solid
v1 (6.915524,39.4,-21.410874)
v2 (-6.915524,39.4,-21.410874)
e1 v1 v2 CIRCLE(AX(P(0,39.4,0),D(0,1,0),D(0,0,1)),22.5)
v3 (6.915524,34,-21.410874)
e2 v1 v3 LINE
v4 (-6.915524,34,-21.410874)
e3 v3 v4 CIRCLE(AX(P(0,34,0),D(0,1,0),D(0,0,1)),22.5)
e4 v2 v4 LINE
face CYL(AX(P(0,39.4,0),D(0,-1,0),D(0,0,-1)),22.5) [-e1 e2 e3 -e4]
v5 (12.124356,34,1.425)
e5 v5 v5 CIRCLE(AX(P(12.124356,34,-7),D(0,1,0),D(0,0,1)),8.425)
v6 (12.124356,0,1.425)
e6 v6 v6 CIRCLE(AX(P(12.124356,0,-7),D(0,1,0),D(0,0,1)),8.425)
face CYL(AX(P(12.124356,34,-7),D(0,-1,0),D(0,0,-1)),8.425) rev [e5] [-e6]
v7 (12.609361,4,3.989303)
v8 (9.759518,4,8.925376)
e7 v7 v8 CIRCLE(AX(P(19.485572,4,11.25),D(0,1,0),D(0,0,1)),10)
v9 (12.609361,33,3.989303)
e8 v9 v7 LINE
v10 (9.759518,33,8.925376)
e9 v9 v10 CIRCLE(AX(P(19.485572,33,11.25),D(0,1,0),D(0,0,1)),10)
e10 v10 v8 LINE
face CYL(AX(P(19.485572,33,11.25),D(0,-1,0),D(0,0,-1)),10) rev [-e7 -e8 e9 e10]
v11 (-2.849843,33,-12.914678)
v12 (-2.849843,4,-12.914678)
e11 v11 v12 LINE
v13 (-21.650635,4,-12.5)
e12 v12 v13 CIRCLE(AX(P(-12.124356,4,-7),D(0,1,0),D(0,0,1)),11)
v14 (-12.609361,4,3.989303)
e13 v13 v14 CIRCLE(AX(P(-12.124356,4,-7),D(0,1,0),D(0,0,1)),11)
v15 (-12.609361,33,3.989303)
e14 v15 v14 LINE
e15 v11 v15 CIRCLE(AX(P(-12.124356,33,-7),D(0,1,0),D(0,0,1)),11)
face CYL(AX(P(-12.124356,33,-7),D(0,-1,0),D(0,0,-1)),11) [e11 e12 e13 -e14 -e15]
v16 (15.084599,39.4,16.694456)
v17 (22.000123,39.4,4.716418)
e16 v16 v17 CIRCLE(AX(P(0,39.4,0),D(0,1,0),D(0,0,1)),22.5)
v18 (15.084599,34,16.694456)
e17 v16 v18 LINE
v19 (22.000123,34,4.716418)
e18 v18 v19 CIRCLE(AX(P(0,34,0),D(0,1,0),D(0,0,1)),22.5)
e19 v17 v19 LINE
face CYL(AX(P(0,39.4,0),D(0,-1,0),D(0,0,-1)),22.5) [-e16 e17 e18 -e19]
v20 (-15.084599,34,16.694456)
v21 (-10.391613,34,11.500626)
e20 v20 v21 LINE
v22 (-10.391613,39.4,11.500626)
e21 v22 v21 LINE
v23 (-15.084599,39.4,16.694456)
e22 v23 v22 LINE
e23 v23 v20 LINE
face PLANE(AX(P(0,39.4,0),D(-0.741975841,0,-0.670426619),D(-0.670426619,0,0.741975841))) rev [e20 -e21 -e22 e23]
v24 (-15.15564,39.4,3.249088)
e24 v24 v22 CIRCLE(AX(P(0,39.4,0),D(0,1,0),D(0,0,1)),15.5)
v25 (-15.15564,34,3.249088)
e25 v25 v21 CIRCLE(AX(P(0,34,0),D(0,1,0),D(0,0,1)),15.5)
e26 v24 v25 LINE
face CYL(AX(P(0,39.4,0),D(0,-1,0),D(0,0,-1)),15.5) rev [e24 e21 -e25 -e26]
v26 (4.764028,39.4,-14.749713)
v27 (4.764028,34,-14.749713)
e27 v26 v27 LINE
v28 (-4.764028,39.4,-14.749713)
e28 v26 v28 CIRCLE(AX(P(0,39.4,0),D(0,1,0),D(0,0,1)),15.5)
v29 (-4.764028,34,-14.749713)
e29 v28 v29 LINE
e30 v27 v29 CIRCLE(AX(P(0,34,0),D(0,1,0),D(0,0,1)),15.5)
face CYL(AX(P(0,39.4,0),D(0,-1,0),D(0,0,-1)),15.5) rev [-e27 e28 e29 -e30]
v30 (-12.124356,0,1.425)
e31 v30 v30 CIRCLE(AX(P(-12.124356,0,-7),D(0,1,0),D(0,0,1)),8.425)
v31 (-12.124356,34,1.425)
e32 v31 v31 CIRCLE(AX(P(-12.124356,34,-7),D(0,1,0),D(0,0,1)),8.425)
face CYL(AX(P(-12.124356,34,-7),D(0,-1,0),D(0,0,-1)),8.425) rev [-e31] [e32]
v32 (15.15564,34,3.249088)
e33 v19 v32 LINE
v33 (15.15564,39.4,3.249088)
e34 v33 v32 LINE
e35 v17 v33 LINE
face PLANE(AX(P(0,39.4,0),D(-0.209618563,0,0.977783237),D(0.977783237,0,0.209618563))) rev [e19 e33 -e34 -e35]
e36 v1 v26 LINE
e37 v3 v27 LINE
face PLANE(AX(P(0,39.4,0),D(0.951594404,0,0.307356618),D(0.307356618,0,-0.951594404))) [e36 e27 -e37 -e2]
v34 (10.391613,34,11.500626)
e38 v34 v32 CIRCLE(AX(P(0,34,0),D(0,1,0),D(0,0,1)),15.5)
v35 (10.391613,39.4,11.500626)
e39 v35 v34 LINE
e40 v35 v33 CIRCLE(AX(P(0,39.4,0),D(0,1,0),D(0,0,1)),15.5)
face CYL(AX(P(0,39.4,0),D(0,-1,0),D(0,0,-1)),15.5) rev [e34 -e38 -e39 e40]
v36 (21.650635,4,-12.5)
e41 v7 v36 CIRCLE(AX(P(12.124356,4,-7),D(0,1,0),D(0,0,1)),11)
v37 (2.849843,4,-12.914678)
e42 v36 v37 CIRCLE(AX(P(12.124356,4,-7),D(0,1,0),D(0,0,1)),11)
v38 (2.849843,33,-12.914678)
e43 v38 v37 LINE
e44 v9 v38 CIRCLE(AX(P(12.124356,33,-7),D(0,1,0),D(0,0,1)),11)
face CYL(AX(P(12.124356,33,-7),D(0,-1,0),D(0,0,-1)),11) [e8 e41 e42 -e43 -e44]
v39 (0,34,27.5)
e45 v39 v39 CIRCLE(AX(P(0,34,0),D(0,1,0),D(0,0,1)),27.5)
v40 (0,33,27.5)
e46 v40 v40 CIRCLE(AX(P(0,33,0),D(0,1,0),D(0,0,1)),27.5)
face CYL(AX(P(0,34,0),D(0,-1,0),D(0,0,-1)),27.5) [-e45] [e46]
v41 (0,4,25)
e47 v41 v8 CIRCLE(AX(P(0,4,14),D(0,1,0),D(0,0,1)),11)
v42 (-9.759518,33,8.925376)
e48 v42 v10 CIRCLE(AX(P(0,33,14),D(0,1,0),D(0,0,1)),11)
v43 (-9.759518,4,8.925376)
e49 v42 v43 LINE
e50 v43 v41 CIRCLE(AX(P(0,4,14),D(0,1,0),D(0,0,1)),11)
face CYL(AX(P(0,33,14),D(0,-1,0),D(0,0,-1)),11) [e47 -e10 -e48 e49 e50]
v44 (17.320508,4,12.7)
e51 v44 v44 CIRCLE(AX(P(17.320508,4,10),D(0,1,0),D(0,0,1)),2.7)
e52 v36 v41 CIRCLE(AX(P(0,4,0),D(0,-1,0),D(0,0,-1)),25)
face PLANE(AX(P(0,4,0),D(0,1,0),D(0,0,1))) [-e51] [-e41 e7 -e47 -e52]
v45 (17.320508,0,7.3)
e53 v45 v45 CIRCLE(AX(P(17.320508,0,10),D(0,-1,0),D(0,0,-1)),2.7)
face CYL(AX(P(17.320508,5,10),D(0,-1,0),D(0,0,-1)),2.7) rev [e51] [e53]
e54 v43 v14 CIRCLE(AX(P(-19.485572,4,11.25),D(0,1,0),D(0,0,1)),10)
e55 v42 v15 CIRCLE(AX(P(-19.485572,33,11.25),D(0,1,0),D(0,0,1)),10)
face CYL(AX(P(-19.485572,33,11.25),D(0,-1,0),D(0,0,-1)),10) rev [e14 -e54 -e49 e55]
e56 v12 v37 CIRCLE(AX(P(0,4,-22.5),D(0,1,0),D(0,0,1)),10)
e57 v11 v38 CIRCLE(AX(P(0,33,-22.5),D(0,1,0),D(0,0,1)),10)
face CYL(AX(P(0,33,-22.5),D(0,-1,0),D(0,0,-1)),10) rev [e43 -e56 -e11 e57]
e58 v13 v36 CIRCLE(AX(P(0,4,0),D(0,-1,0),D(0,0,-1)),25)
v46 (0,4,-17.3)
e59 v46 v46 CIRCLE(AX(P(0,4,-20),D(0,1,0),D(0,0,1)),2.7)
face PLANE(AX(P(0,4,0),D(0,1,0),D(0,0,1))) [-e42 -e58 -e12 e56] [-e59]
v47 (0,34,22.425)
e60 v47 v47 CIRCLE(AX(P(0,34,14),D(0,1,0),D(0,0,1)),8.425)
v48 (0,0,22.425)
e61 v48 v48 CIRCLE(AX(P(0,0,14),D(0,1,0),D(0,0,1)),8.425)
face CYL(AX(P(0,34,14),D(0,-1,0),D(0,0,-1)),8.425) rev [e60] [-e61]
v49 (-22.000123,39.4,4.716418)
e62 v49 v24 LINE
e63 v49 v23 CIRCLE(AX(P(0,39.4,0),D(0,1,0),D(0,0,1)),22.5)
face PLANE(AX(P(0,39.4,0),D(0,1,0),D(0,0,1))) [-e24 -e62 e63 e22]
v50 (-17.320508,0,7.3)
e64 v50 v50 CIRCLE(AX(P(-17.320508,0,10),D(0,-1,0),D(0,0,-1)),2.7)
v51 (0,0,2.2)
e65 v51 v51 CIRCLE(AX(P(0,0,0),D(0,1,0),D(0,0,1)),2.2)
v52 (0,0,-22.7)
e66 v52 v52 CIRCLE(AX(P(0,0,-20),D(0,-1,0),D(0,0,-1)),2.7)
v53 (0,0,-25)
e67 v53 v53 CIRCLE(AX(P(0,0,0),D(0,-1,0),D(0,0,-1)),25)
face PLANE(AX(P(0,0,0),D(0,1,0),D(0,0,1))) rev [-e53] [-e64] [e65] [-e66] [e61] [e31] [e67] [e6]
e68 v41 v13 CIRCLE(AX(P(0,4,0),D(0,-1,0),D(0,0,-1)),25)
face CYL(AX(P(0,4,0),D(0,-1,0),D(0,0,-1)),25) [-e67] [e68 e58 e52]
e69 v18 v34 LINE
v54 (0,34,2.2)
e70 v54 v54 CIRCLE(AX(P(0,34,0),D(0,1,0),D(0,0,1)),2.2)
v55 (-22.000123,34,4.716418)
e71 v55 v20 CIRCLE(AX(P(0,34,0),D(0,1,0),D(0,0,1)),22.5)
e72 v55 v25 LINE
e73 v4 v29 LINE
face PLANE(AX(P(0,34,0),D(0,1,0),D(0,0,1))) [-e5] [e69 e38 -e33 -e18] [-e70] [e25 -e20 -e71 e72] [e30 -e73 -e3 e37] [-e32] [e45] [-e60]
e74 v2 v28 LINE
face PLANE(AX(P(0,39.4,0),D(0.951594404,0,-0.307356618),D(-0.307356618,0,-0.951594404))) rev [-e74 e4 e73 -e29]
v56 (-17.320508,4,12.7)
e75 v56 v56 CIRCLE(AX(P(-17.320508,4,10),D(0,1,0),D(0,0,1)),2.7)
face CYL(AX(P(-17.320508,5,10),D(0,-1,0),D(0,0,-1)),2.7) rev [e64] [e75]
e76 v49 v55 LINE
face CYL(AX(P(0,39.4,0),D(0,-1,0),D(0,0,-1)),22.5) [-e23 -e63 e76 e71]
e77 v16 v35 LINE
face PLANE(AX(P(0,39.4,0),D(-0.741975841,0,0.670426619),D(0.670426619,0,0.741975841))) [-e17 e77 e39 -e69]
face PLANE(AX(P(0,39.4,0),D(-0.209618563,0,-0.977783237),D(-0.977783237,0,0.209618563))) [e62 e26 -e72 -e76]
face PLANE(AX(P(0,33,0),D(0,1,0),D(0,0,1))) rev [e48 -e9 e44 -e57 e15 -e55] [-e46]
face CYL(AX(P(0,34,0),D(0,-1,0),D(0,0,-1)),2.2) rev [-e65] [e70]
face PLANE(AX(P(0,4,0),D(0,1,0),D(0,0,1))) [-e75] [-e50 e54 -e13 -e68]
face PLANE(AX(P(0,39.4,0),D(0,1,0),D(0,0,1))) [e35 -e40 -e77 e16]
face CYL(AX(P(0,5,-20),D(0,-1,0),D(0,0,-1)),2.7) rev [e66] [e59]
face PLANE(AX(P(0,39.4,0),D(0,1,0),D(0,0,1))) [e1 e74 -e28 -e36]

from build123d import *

# Parameters (mm, degrees)
SKETCH1_R           = 27.5
SKETCH1_R_2         = 2.2
SKETCH1_R_3         = 8.425
BOSS_EXTRUDE1_DEPTH = 34
BOSS_EXTRUDE2_DEPTH = 5.4
SKETCH5_R           = 40.989273042
CUT_EXTRUDE1_DEPTH  = 29
SKETCH6_R           = 2.7
CUT_EXTRUDE2_DEPTH  = 5
SKETCH7_R           = 33.756466266
SKETCH7_R_2         = 25
CUT_EXTRUDE6_DEPTH  = 4


with BuildPart() as part:
    # Sketch1 → Boss-Extrude1 (new body)
    with BuildSketch(Plane(origin=(0, 0, 0), x_dir=(1, 0, 0), z_dir=(0, 1, 0))):
        Circle(SKETCH1_R)
        Circle(SKETCH1_R_2, mode=Mode.SUBTRACT)
        with Locations((0, -14)):
            Circle(SKETCH1_R_3, mode=Mode.SUBTRACT)
        with Locations((-12.124355653, 7)):
            Circle(SKETCH1_R_3, mode=Mode.SUBTRACT)
        with Locations((12.124355653, 7)):
            Circle(SKETCH1_R_3, mode=Mode.SUBTRACT)
    extrude(amount=BOSS_EXTRUDE1_DEPTH)

    # Sketch4 → Boss-Extrude2 (add)
    with BuildSketch(Plane(origin=(0, 34, 0), x_dir=(1, 0, 0), z_dir=(0, 1, 0))):
        with BuildLine():
            ThreePointArc((15.15564017, -3.249087725), (13.423393759, -7.75), (10.391612594, -11.500625535))
            Line((10.391612594, -11.500625535), (15.084598927, -16.694456422))
            ThreePointArc((15.084598927, -16.694456422), (19.485571585, -11.25), (22.000122827, -4.716417665))
            Line((22.000122827, -4.716417665), (15.15564017, -3.249087725))
        make_face()
        with BuildLine():
            Line((-15.084598927, -16.694456422), (-10.391612594, -11.500625535))
            ThreePointArc((-10.391612594, -11.500625535), (-13.423393759, -7.75), (-15.15564017, -3.249087725))
            Line((-15.15564017, -3.249087725), (-22.000122827, -4.716417665))
            ThreePointArc((-22.000122827, -4.716417665), (-19.485571585, -11.25), (-15.084598927, -16.694456422))
        make_face()
        with BuildLine():
            ThreePointArc((-4.764027576, 14.74971326), (0, 15.5), (4.764027576, 14.74971326))
            Line((4.764027576, 14.74971326), (6.9155239, 21.410874087))
            ThreePointArc((6.9155239, 21.410874087), (0, 22.5), (-6.9155239, 21.410874087))
            Line((-6.9155239, 21.410874087), (-4.764027576, 14.74971326))
        make_face()
    extrude(amount=BOSS_EXTRUDE2_DEPTH)

    # Sketch5 → Cut-Extrude1 (cut)
    with BuildSketch(Plane(origin=(0, 4, 0), x_dir=(1, 0, 0), z_dir=(0, 1, 0))):
        Circle(SKETCH5_R)
        with BuildLine():
            ThreePointArc((-2.849843175, 12.914678207), (0, 12.5), (2.849843175, 12.914678207))
            ThreePointArc((2.849843175, 12.914678207), (21.650635095, 12.5), (12.609360996, -3.989302517))
            ThreePointArc((12.609360996, -3.989302517), (10.825317547, -6.25), (9.759517821, -8.925375689))
            ThreePointArc((9.759517821, -8.925375689), (0, -25), (-9.759517821, -8.925375689))
            ThreePointArc((-9.759517821, -8.925375689), (-10.825317547, -6.25), (-12.609360996, -3.989302517))
            ThreePointArc((-12.609360996, -3.989302517), (-21.650635095, 12.5), (-2.849843175, 12.914678207))
        make_face(mode=Mode.SUBTRACT)
    extrude(amount=CUT_EXTRUDE1_DEPTH, mode=Mode.SUBTRACT)

    # Sketch6 → Cut-Extrude2 (cut)
    with BuildSketch(Plane.XZ):
        with Locations((0, -20)):
            Circle(SKETCH6_R)
        with Locations((-17.320508076, 10)):
            Circle(SKETCH6_R)
        with Locations((17.320508076, 10)):
            Circle(SKETCH6_R)
    extrude(amount=-CUT_EXTRUDE2_DEPTH, mode=Mode.SUBTRACT)

    # Sketch7 → Cut-Extrude6 (cut)
    with BuildSketch(Plane.XZ):
        Circle(SKETCH7_R)
        Circle(SKETCH7_R_2, mode=Mode.SUBTRACT)
    extrude(amount=-CUT_EXTRUDE6_DEPTH, mode=Mode.SUBTRACT)


solid = part.part
